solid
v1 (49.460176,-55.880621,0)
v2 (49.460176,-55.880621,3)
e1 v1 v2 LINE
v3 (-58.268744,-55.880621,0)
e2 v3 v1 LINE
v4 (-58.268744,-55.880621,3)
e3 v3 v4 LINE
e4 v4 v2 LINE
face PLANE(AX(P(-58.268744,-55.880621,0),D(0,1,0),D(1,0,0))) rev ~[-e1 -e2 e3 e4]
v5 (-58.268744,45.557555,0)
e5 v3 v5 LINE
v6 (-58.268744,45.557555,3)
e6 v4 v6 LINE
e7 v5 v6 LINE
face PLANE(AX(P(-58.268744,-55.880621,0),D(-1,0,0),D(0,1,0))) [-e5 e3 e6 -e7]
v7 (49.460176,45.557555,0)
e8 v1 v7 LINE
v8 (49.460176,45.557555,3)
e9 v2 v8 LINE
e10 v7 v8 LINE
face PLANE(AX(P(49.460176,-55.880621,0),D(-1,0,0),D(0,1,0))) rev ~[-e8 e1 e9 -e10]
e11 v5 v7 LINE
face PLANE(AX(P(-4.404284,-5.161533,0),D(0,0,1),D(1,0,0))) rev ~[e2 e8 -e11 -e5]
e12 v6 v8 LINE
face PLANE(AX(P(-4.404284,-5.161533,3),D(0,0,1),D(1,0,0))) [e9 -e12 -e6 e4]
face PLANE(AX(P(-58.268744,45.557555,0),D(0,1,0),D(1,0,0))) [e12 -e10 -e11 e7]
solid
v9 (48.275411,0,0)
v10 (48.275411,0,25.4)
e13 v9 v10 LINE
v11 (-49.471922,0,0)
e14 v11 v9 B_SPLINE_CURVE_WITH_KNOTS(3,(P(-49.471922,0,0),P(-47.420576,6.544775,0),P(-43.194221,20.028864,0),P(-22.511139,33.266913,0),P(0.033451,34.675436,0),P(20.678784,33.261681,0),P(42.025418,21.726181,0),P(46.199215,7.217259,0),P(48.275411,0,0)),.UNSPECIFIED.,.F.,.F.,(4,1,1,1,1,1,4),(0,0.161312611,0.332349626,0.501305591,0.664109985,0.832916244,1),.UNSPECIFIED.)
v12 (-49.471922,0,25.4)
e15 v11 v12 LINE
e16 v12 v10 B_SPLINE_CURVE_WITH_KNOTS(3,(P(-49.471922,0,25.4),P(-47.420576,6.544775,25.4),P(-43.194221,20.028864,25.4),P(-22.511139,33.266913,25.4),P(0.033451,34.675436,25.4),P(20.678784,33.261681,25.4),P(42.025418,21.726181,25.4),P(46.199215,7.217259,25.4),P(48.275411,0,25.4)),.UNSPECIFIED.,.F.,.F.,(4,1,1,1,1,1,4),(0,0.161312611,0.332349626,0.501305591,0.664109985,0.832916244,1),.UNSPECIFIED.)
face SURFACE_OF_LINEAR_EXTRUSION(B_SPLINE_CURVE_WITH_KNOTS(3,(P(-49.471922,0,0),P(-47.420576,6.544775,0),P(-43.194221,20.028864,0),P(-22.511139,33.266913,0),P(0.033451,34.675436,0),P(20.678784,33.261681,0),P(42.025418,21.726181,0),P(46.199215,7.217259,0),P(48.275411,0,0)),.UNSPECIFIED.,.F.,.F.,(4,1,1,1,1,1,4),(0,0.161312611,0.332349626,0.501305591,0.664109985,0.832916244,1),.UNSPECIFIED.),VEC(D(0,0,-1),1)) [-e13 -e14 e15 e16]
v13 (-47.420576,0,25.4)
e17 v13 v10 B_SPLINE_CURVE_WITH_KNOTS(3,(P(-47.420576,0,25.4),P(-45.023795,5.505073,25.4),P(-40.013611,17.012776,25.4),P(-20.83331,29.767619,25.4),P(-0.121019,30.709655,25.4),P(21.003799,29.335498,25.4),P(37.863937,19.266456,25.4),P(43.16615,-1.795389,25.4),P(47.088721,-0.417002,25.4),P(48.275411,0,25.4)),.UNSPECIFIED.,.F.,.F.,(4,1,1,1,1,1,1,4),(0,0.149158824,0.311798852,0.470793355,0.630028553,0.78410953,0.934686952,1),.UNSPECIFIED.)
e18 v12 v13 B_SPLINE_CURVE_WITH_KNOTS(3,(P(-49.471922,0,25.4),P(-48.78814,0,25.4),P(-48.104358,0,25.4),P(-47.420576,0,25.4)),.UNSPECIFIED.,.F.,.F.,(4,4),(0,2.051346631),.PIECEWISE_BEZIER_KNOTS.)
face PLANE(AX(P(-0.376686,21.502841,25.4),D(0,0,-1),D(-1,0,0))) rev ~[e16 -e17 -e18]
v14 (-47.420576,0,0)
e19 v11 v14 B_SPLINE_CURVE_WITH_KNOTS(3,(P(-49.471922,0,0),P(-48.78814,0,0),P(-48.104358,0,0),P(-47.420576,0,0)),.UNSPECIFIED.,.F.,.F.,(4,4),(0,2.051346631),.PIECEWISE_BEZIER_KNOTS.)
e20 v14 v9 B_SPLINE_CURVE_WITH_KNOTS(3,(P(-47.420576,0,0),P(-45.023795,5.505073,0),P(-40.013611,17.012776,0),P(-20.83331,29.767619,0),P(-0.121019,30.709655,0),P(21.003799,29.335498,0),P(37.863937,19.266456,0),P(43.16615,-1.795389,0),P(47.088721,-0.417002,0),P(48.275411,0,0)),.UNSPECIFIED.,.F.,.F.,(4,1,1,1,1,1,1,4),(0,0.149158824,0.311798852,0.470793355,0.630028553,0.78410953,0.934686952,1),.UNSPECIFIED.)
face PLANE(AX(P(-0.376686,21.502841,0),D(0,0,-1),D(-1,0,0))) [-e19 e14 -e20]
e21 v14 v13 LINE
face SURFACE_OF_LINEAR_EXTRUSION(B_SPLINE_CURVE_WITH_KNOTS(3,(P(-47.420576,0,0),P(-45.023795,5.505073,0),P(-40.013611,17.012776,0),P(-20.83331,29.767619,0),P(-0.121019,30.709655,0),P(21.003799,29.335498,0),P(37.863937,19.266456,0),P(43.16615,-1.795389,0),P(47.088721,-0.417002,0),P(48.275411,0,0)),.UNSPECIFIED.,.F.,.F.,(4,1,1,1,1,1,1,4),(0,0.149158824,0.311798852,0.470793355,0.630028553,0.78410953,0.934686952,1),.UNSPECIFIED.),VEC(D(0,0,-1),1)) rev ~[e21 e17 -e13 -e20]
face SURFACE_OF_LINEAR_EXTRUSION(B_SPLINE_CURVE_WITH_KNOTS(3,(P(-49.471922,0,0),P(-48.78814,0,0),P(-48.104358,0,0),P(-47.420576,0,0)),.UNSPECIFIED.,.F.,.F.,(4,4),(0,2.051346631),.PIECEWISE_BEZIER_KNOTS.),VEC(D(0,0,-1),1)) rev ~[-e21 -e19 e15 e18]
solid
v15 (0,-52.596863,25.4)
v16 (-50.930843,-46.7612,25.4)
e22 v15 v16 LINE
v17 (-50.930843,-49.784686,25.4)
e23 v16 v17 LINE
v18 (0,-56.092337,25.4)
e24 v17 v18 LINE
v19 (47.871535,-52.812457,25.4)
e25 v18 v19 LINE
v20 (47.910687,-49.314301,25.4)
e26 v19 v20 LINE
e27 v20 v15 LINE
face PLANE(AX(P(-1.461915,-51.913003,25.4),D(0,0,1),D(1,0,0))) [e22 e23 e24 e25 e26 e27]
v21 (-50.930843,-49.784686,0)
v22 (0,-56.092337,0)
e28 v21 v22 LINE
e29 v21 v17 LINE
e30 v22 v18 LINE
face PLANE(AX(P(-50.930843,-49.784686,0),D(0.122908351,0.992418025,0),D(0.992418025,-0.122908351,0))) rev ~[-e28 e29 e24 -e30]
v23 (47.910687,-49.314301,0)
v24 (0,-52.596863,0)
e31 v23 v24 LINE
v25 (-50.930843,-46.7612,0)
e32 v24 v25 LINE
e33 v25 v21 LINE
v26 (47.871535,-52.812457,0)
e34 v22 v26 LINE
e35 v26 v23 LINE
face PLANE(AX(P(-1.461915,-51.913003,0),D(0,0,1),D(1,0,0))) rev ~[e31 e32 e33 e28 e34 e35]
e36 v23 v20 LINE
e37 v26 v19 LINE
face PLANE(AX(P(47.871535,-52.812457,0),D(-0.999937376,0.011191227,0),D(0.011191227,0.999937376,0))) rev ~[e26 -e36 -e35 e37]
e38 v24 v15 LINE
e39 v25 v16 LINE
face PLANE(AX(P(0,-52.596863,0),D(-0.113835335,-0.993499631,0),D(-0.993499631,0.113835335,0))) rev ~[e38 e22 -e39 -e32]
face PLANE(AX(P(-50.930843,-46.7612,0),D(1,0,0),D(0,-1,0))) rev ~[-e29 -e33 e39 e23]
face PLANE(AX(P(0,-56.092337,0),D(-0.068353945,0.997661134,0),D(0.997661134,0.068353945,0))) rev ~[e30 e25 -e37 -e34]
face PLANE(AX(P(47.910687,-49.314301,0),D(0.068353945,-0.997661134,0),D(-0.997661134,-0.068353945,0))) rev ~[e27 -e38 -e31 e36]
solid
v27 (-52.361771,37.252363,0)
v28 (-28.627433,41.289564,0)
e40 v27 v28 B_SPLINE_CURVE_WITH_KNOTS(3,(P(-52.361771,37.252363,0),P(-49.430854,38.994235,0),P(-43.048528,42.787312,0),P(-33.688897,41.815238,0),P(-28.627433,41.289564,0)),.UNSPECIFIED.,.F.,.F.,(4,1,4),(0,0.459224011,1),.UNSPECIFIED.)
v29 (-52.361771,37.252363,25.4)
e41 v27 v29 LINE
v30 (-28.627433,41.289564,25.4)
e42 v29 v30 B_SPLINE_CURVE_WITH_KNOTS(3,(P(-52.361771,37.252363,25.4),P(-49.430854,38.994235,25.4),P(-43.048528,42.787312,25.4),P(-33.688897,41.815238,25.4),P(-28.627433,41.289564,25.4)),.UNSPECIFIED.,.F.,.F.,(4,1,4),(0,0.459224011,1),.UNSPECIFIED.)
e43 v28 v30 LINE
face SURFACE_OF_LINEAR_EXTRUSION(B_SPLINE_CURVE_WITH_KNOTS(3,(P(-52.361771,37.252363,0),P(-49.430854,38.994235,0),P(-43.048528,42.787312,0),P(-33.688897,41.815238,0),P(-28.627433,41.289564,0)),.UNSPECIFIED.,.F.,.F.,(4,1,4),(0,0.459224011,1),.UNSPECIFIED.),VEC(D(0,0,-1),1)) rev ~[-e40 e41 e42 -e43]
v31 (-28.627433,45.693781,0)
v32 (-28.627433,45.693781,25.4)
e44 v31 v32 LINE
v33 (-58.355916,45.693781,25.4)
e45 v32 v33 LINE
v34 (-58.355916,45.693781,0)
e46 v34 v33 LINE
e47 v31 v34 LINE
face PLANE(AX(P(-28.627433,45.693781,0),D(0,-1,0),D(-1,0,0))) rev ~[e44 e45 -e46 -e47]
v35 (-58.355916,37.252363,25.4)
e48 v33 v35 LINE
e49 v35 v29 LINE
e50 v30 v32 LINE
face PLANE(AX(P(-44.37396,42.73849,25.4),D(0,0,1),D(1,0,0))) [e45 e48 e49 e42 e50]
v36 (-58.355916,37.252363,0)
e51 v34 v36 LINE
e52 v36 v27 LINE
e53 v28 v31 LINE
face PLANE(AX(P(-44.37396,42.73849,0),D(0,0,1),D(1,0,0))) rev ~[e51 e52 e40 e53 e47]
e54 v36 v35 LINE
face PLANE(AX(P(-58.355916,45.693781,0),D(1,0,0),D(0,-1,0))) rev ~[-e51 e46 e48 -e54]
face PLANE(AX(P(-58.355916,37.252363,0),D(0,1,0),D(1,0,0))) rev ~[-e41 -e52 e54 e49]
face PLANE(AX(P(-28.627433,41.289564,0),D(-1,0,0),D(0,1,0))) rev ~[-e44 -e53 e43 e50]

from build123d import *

# Parameters (mm, degrees)
F2_DEPTH = 25.4
F4_DEPTH = 25.4
F7_W     = 107.728920877
F7_H     = 101.4381758869
F8_DEPTH = 3


# Not quite as in the source:
# - a feature of the source that left no trace in its solid (it failed there, or was rolled back) is left out


with BuildPart() as f2:
    # F1 (on Top) → F2 (new body)
    with BuildSketch(Plane.XY):
        Polygon((0, -52.5968633592), (-50.9308427572, -46.761199832), (-50.9308427572, -49.7846864164), (0, -56.0923367739), (47.871535476, -52.812457282), (47.9106865823, -49.314301461), align=None)
    extrude(amount=F2_DEPTH)


with BuildPart() as f2b:
    # F1 (on Top) → F2, piece 2 (new body)
    with BuildSketch(Plane.XY):
        with BuildLine():
            add(Edge.make_bspline(
                [(-49.4719222188, 0), (-47.4205755879, 6.544775019), (-43.1942210623, 20.0288635212), (-22.5111385572, 33.2669128259), (0.0334513522, 34.6754363871), (20.6787838864, 33.2616809804), (42.0254177462, 21.7261812452), (46.1992146547, 7.2172589855), (48.275411129, 0)],
                knots=[0, 0, 0, 0, 0.1613126113, 0.3323496255, 0.5013055914, 0.6641099851, 0.8329162439, 1, 1, 1, 1], degree=3))
            add(Edge.make_bspline(
                [(-49.4719222188, 0), (-48.7881400085, 0), (-48.1043577982, 0), (-47.4205755879, 0)],
                knots=[0, 0, 0, 0, 2.0513466309, 2.0513466309, 2.0513466309, 2.0513466309], degree=3))
            add(Edge.make_bspline(
                [(-47.4205755879, 0), (-45.023795475, 5.5050731836), (-40.013610592, 17.0127764963), (-20.8333104147, 29.7676194141), (-0.1210192078, 30.7096554729), (21.0037992002, 29.3354980818), (37.8639372795, 19.2664559838), (43.1661496501, -1.7953891308), (47.0887209969, -0.4170016691), (48.275411129, 0)],
                knots=[0, 0, 0, 0, 0.1491588243, 0.3117988516, 0.4707933547, 0.6300285532, 0.78410953, 0.9346869521, 1, 1, 1, 1], degree=3))
        make_face()
    extrude(amount=F2_DEPTH)


with BuildPart() as f4:
    # F0 (on Top) → F4 (new body)
    with BuildSketch(Plane.XY):
        with BuildLine():
            Line((-58.3559162915, 37.2523628175), (-52.3617714643, 37.2523628175))
            add(Edge.make_bspline(
                [(-52.3617714643, 37.2523628175), (-49.4308542357, 38.9942348261), (-43.0485284896, 42.7873117707), (-33.688896908, 41.8152382446), (-28.6274328828, 41.2895642221)],
                knots=[0, 0, 0, 0, 0.459224011, 1, 1, 1, 1], degree=3))
            Line((-28.6274328828, 41.2895642221), (-28.6274328828, 45.6937812269))
            Line((-28.6274328828, 45.6937812269), (-58.3559162915, 45.6937812269))
            Line((-58.3559162915, 45.6937812269), (-58.3559162915, 37.2523628175))
        make_face()
    extrude(amount=F4_DEPTH)


with BuildPart() as f8:
    # F7 (on Top) → F8 (new body)
    with BuildSketch(Plane.XY):
        with Locations((-4.40428406, -5.1615331322)):
            Rectangle(F7_W, F7_H)
    extrude(amount=F8_DEPTH)


solid = Compound([f2.part, f2b.part, f4.part, f8.part])
